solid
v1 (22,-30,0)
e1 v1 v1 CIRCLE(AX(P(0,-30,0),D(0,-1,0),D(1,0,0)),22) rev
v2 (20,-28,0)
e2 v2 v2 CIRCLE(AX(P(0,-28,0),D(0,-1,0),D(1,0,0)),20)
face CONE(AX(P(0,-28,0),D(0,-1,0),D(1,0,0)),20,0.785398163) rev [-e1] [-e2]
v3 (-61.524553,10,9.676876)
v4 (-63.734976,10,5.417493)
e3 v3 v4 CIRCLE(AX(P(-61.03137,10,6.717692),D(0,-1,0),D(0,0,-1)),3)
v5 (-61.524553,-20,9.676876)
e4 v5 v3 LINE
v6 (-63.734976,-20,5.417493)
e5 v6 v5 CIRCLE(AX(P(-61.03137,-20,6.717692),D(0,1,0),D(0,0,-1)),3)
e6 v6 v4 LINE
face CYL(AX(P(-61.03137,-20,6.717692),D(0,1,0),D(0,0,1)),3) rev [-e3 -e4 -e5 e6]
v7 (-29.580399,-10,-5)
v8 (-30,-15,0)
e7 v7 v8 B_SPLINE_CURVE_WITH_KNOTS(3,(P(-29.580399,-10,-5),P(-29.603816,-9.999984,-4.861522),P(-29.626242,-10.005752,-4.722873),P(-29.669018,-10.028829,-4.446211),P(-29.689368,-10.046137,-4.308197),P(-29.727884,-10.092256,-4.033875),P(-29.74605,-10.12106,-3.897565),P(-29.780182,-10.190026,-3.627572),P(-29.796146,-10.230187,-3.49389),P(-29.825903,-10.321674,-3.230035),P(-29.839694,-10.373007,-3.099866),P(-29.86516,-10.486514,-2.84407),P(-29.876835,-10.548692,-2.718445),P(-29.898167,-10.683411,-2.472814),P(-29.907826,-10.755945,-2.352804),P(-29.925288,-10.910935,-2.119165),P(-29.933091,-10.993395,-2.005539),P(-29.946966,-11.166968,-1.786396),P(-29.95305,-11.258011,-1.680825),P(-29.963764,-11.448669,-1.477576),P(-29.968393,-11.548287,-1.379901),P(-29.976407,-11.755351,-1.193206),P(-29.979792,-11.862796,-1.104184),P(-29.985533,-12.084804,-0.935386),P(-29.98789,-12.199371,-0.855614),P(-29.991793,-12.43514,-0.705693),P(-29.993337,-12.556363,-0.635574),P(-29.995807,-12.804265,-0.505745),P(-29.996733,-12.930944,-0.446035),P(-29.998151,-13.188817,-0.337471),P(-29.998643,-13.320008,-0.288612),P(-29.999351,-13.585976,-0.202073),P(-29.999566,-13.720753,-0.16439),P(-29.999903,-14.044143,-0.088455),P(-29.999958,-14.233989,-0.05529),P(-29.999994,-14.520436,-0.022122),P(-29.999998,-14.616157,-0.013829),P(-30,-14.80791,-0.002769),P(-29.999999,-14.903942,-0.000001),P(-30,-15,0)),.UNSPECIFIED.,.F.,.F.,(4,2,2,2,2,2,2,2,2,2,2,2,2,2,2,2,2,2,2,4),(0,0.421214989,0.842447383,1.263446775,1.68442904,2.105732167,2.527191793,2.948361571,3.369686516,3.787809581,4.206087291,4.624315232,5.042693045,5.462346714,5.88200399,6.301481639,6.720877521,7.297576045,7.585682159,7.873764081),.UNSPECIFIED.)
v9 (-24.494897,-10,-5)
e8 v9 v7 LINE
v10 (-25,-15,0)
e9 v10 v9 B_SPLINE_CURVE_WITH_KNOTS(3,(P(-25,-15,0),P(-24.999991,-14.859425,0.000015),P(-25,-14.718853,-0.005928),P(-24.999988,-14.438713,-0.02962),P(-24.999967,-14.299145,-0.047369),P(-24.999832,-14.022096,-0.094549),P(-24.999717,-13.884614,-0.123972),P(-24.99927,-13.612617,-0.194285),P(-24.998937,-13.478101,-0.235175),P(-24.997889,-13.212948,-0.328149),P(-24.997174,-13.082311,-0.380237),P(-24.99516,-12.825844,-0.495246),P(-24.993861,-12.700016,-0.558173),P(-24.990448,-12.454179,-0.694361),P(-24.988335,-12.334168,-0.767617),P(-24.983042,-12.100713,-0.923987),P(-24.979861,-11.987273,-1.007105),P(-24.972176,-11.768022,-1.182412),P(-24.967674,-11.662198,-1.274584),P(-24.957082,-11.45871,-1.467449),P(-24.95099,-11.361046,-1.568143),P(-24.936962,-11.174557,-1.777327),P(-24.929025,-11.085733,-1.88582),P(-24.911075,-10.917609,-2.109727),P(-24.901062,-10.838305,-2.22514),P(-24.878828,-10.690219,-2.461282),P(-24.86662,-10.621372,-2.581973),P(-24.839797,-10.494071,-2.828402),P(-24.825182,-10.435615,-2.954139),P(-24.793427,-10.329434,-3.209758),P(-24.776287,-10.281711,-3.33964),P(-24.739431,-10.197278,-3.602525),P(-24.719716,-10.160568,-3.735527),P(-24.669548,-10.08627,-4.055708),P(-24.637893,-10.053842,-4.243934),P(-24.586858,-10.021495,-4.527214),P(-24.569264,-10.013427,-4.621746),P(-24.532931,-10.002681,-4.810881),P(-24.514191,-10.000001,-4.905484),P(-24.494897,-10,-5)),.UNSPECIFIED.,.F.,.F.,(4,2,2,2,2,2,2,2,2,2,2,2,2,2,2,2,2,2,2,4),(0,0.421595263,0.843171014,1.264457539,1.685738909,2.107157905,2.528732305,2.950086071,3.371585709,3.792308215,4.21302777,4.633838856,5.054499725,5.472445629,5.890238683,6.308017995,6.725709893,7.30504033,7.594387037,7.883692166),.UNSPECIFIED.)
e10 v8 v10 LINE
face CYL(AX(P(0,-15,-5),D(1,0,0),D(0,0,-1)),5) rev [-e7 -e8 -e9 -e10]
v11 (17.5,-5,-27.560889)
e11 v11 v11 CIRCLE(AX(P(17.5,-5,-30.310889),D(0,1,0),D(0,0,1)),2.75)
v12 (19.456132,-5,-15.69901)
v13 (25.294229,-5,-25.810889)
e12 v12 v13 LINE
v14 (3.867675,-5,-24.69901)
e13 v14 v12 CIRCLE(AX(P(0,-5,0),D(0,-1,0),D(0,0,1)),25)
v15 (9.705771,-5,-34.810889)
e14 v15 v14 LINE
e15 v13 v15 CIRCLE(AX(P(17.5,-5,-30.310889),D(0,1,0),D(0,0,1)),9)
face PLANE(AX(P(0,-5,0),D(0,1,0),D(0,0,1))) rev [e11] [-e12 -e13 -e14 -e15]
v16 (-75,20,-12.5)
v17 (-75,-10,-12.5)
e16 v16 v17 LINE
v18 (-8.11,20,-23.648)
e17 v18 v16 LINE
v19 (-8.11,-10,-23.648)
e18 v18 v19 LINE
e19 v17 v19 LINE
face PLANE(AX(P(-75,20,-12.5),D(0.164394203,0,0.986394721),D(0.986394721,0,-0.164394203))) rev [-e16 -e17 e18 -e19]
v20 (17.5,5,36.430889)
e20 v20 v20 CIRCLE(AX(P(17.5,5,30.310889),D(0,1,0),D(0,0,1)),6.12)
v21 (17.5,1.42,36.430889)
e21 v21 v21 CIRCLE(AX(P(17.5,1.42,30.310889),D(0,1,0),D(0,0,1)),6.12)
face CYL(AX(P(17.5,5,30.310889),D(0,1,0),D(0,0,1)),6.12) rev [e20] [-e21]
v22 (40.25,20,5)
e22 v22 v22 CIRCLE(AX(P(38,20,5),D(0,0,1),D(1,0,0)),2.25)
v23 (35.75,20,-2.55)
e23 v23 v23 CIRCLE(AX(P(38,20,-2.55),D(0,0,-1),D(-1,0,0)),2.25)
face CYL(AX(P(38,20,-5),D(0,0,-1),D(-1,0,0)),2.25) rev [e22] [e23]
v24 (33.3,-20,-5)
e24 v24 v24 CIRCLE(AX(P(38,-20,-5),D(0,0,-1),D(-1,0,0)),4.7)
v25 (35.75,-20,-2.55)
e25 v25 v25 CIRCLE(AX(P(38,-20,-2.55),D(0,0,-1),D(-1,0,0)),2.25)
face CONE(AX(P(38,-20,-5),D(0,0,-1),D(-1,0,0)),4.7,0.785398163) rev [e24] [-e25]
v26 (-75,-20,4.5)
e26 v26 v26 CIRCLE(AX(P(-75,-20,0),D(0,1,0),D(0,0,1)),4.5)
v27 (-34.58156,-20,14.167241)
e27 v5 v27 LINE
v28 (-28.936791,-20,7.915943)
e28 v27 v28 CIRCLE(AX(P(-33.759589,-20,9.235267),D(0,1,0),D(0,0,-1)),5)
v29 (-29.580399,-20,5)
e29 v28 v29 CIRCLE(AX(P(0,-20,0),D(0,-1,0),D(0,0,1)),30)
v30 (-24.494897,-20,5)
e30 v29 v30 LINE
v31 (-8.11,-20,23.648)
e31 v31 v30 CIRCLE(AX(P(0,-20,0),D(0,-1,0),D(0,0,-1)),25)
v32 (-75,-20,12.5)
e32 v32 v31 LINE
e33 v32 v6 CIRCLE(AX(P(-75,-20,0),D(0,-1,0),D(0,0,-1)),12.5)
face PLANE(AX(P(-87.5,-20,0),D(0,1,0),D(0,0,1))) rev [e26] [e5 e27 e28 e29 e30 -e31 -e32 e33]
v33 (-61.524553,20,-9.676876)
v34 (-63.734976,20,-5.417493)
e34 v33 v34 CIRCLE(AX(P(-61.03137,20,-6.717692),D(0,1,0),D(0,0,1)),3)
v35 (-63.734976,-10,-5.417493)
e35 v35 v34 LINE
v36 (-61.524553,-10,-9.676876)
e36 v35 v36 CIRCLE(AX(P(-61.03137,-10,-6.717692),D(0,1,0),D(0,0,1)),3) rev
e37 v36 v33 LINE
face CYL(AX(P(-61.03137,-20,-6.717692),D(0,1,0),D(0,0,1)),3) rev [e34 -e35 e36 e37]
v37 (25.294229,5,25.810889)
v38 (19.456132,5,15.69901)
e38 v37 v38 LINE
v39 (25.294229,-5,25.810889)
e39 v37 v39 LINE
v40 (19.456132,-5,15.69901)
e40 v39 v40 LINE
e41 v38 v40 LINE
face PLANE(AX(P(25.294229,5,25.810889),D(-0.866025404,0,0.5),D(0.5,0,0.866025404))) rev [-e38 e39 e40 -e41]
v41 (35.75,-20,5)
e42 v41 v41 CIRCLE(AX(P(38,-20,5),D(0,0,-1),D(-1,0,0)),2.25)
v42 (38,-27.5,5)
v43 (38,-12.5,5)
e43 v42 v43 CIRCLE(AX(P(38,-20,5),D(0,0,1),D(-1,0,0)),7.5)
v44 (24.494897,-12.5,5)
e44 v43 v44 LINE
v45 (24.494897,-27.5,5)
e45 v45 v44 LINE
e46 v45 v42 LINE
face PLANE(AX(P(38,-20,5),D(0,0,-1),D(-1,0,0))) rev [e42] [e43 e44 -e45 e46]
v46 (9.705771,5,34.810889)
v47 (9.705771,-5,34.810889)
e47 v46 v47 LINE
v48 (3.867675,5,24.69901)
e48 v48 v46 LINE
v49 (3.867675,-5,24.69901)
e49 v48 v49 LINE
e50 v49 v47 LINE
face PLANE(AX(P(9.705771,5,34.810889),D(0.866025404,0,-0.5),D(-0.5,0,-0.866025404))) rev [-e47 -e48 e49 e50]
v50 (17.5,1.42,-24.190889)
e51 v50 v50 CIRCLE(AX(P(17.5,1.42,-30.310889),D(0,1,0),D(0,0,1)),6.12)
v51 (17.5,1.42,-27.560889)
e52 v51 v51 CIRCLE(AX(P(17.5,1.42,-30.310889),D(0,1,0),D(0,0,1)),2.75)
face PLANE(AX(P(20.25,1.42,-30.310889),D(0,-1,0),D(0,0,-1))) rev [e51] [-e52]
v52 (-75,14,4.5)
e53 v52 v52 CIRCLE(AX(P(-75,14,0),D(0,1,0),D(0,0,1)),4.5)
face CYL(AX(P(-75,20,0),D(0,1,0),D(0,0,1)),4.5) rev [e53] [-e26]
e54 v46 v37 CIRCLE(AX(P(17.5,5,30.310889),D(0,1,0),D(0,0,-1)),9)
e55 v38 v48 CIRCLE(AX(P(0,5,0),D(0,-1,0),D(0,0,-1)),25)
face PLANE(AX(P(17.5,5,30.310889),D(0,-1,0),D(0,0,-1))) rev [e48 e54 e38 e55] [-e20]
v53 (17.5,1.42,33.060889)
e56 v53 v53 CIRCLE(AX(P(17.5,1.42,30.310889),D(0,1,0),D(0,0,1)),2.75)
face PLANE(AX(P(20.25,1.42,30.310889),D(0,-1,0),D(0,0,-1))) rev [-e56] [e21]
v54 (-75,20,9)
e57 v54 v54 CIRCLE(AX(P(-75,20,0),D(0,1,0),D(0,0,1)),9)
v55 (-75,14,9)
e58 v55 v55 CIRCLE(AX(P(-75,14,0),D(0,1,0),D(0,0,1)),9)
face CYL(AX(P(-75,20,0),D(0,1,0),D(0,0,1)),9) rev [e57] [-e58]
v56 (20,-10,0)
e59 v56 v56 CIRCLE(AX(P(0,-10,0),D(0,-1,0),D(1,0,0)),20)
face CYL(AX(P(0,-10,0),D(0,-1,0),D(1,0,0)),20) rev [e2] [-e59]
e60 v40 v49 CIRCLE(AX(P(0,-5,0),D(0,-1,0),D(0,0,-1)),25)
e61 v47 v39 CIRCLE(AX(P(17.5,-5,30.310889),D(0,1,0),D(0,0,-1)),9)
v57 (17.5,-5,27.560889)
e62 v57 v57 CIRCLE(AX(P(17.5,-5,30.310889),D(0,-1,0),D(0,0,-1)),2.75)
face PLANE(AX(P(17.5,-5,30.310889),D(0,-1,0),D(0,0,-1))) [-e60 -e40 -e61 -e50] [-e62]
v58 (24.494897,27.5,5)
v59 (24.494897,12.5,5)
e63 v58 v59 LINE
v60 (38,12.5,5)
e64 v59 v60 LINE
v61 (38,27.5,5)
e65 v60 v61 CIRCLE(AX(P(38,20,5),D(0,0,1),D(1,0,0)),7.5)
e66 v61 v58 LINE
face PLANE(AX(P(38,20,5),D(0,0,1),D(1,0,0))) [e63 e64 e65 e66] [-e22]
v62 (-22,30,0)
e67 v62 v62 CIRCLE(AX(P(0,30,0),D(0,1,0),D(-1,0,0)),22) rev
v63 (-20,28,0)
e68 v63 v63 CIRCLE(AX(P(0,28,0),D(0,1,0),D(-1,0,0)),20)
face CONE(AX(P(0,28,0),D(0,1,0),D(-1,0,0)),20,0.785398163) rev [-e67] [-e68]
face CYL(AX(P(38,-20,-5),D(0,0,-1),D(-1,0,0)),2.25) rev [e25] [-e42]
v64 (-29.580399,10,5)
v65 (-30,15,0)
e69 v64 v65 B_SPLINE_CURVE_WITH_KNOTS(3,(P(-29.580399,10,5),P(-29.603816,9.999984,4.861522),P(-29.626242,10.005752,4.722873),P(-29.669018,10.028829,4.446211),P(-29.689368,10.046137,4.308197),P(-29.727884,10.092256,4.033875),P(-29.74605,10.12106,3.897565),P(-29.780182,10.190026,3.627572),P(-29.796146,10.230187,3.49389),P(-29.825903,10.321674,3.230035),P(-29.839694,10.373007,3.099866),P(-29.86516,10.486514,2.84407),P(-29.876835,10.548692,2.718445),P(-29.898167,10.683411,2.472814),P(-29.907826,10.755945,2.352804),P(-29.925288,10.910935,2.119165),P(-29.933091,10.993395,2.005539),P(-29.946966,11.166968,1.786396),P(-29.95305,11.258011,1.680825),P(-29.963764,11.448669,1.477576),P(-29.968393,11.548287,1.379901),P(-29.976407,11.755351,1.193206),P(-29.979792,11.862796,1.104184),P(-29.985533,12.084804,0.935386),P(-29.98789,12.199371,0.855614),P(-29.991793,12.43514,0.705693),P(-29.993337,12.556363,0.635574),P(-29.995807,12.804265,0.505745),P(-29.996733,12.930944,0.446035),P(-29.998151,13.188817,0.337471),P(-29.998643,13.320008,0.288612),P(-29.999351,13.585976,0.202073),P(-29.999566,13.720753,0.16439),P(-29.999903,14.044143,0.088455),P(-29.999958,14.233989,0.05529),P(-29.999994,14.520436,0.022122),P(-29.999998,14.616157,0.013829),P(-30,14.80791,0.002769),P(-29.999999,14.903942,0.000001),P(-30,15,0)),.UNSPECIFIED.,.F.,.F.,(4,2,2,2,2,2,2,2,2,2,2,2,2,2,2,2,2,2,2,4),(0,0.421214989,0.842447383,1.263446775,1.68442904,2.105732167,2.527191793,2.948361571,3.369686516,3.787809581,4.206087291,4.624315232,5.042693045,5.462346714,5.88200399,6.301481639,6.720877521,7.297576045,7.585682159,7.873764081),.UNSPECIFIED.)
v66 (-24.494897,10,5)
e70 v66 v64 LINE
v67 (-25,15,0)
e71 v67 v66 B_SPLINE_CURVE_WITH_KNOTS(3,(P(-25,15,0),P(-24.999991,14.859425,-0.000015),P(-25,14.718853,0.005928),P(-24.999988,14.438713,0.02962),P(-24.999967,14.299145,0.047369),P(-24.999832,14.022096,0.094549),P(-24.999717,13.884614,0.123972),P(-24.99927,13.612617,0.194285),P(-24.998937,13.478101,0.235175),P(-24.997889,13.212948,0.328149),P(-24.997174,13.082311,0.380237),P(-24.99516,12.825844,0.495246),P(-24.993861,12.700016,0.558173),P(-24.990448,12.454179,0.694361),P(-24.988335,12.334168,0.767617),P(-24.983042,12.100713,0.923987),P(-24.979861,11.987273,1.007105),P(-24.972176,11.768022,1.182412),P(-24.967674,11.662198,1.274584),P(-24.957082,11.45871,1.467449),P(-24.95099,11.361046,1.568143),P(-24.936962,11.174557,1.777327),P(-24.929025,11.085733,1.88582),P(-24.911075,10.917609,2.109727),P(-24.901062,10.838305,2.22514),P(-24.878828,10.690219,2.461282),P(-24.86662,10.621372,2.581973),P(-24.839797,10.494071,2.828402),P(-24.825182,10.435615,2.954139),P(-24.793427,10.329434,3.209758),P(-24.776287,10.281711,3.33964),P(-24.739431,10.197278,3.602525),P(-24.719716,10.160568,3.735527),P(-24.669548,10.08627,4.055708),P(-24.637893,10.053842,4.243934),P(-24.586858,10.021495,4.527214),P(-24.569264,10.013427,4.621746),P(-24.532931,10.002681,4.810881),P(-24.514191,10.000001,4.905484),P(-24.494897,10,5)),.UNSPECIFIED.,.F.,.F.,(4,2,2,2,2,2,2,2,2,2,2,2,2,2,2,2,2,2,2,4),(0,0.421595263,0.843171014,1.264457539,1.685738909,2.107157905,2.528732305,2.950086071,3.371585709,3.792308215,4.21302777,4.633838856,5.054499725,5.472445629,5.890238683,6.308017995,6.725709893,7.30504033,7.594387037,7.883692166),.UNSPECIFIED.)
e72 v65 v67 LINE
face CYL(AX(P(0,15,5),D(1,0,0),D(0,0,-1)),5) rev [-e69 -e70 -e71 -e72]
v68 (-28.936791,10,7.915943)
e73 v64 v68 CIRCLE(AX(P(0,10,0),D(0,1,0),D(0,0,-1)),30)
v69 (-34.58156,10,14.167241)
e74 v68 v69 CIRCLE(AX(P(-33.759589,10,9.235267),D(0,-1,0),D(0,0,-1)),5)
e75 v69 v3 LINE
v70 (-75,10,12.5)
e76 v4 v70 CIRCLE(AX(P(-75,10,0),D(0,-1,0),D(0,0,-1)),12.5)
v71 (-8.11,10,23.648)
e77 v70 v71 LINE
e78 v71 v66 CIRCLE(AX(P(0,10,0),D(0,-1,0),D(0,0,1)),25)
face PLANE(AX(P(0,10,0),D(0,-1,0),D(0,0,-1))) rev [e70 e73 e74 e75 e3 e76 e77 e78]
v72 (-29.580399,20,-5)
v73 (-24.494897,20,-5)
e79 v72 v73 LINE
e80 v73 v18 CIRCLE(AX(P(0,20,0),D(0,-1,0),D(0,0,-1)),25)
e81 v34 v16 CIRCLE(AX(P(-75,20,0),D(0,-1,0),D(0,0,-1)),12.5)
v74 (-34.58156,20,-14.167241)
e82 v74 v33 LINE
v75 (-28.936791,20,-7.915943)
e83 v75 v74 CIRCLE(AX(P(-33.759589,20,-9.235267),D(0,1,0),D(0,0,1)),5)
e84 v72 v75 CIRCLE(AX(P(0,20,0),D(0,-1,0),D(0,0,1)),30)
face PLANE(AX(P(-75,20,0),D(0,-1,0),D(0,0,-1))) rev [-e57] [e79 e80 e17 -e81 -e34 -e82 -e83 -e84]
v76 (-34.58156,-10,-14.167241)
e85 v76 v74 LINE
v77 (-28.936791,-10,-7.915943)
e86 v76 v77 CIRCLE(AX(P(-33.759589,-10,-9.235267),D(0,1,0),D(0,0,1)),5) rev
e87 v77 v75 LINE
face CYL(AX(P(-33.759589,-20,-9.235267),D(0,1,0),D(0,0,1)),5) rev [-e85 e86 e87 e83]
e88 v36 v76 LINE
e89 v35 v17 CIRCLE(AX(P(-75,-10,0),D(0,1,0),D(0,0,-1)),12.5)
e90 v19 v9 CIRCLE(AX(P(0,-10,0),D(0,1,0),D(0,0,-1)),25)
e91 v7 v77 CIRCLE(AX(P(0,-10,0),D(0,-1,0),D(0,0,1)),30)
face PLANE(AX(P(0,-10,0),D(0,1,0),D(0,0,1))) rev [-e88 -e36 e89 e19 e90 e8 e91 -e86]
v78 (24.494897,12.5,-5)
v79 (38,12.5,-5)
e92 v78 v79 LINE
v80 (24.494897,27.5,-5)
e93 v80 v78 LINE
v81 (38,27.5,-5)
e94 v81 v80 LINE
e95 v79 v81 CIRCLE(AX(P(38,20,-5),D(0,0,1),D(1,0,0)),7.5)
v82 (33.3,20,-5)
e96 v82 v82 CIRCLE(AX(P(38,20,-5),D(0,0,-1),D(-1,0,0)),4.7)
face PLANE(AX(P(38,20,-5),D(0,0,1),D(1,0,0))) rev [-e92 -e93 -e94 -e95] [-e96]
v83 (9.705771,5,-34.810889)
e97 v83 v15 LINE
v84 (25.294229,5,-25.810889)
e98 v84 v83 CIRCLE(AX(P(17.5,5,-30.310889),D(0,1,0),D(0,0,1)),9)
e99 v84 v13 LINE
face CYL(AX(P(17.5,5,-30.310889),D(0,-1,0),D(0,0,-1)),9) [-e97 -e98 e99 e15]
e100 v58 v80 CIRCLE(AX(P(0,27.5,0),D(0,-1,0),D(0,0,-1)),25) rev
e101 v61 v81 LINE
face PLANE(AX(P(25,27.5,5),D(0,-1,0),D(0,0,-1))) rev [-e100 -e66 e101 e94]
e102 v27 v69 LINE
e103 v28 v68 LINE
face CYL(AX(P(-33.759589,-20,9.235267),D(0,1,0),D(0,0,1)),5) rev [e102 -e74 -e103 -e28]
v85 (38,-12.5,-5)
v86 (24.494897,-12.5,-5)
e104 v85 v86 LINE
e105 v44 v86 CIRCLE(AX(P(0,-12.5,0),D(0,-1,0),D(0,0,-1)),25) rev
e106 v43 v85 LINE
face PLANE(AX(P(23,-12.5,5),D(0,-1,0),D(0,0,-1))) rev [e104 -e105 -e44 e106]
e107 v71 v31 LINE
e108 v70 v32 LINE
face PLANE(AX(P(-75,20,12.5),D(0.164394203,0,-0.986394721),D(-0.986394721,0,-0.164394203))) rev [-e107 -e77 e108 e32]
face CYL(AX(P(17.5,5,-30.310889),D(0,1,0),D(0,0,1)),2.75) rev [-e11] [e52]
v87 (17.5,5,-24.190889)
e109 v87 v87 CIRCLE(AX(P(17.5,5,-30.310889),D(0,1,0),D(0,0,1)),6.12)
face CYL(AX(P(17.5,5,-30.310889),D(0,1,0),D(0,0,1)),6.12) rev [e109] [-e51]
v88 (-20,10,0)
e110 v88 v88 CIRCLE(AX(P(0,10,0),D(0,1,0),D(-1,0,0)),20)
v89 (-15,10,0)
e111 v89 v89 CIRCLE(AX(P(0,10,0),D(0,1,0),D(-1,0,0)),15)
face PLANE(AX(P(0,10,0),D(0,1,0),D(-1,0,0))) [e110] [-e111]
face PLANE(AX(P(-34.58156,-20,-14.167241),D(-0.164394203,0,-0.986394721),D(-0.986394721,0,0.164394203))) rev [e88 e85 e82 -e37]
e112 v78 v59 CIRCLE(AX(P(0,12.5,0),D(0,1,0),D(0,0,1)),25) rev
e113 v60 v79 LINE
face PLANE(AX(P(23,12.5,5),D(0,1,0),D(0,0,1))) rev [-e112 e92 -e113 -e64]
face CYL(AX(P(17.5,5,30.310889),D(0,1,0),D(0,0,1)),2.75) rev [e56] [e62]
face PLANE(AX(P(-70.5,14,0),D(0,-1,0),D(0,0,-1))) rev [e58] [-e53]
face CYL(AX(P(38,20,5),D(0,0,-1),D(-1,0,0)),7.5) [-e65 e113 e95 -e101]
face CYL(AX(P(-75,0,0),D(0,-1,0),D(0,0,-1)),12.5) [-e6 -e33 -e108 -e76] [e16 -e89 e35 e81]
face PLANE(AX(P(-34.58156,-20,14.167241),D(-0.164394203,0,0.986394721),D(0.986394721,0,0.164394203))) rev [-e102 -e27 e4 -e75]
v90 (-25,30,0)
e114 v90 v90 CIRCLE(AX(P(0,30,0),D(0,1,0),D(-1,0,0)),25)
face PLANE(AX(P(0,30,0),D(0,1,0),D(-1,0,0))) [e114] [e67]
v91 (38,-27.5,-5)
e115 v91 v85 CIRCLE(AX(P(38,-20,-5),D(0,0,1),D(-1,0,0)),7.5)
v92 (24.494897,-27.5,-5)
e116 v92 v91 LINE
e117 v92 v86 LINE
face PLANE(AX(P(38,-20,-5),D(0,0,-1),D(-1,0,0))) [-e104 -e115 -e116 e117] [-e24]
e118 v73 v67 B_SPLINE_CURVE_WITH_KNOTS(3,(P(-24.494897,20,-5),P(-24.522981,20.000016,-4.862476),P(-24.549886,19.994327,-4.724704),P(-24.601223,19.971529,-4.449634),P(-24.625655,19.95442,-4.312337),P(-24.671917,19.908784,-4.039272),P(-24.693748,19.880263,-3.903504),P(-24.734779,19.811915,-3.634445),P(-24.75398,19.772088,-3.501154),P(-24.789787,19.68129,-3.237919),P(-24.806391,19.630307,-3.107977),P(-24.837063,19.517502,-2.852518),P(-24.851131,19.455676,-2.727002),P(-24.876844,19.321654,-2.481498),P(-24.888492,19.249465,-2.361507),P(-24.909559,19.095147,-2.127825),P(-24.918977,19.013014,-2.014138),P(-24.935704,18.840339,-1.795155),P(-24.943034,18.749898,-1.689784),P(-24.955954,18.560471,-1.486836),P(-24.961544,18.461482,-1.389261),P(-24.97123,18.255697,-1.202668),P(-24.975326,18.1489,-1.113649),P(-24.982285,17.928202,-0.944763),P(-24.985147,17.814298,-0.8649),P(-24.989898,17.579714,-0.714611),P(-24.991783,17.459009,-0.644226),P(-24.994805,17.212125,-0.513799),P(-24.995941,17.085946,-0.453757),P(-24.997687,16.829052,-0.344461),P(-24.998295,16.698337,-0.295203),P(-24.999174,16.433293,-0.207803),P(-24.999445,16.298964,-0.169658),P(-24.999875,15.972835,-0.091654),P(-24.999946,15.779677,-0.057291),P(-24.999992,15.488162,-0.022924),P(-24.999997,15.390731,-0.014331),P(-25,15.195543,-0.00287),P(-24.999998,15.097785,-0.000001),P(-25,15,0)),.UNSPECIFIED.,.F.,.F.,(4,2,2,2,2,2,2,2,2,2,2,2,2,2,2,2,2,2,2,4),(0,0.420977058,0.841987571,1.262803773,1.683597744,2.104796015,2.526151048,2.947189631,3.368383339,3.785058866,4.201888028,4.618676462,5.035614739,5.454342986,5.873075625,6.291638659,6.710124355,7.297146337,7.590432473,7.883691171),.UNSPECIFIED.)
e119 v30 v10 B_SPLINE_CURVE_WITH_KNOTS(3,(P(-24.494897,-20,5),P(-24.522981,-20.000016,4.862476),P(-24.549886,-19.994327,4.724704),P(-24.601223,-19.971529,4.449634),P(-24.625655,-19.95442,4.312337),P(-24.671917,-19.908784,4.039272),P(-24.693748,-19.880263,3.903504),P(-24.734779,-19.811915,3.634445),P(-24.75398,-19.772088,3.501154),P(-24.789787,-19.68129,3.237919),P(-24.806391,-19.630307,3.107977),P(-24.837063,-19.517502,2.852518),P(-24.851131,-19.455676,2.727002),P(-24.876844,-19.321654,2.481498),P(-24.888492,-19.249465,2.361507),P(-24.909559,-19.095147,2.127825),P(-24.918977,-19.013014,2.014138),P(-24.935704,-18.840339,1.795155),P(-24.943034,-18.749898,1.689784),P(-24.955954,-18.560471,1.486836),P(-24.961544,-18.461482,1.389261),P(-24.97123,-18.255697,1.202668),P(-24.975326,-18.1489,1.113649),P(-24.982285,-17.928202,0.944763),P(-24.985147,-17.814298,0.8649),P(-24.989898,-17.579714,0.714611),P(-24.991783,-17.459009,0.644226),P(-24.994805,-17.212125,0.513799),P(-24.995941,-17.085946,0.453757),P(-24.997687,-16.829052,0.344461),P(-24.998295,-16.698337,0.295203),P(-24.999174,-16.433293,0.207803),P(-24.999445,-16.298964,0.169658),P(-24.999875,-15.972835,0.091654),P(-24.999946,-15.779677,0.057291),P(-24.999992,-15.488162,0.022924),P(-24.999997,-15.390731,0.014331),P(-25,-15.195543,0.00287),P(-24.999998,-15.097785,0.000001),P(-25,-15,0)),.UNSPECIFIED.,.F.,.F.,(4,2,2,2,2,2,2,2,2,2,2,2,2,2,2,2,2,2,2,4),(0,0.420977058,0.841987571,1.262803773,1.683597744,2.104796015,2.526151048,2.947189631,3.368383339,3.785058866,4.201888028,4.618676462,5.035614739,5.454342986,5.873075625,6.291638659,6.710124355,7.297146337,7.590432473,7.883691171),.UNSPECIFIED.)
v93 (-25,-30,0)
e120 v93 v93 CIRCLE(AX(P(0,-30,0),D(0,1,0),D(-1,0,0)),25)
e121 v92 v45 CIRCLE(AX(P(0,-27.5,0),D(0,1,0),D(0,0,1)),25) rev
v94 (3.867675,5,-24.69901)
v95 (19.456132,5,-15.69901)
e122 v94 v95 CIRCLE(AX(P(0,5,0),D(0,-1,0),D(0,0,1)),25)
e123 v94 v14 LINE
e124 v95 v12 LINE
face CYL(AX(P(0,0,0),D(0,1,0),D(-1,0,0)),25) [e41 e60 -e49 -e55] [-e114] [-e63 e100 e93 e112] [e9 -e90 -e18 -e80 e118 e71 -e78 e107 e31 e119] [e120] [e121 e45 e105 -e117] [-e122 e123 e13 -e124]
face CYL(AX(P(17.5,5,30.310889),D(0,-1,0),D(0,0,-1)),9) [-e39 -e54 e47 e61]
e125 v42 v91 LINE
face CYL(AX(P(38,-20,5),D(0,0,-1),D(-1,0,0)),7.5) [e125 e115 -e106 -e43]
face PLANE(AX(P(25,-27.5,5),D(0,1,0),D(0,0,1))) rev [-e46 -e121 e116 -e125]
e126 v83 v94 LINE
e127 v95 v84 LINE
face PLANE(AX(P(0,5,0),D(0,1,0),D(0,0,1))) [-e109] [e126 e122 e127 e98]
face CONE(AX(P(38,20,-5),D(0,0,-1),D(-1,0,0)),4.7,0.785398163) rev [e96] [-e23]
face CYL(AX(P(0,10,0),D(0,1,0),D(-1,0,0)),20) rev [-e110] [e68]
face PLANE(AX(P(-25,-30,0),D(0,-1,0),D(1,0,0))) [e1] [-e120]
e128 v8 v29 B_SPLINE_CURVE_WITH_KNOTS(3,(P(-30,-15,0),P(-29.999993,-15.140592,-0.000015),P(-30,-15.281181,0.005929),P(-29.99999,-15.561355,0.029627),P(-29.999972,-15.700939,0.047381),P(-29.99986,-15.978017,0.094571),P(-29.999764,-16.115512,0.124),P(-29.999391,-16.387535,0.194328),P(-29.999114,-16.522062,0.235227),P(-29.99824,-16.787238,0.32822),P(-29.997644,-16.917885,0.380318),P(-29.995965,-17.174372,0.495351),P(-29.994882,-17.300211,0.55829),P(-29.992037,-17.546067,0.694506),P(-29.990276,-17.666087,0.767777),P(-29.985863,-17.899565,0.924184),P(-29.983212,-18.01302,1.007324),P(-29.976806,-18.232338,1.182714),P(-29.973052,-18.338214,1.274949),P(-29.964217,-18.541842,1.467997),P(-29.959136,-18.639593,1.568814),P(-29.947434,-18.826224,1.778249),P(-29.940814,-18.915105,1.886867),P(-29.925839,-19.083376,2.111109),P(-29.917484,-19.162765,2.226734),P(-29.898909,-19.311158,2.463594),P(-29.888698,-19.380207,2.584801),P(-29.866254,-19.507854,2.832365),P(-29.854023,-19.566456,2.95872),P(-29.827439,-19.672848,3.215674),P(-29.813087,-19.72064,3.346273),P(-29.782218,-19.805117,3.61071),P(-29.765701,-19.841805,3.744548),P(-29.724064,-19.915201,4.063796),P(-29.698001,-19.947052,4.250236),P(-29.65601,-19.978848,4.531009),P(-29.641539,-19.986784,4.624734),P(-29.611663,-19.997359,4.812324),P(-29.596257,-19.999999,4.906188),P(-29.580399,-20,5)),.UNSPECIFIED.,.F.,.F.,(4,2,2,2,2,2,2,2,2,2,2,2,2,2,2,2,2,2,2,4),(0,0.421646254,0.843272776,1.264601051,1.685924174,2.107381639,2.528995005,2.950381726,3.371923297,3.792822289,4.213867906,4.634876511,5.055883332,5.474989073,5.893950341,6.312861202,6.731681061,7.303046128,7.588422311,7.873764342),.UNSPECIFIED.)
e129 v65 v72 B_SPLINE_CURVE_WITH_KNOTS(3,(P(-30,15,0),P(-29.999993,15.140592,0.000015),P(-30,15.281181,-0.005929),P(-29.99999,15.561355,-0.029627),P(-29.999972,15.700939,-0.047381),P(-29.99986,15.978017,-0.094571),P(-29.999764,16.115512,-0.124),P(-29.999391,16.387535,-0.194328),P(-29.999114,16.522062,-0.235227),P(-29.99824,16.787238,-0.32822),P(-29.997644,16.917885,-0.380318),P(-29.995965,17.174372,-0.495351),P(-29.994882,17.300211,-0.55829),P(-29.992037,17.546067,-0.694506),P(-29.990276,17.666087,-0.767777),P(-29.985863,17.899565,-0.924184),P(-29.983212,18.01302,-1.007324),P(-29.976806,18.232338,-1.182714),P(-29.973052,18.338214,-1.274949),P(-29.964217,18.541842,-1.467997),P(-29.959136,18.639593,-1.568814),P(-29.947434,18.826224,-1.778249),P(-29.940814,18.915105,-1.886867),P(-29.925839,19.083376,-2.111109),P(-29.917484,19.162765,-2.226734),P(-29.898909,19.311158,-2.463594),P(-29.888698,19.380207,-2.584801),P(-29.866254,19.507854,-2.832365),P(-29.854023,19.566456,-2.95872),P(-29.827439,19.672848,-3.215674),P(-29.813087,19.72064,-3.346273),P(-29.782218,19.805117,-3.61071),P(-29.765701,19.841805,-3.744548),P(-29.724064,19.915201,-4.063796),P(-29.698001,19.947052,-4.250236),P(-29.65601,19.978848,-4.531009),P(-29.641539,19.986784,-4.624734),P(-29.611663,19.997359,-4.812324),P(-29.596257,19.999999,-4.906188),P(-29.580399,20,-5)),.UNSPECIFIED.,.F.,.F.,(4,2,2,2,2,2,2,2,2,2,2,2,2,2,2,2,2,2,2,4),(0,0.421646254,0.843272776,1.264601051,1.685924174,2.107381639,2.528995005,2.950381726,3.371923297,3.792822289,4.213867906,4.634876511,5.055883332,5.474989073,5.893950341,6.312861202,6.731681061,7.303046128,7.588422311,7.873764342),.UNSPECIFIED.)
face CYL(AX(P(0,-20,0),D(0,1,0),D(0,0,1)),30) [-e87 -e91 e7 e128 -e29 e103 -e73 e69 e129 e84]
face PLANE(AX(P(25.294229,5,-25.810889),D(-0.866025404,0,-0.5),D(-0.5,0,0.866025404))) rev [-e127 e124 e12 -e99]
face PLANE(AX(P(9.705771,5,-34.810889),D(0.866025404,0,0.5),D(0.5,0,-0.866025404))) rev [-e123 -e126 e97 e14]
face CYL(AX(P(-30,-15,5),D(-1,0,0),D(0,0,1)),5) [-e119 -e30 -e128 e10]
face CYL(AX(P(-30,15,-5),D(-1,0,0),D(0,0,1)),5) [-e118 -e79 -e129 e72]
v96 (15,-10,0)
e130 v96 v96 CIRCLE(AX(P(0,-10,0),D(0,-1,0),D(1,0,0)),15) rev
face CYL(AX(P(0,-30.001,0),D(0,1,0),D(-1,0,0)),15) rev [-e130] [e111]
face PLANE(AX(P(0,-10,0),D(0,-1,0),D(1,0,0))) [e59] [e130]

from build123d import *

# Parameters (mm, degrees)
SKETCH3_R                                      = 20
CUT_EXTRUDE1_DEPTH                             = 20
CUT_EXTRUDE2_START                             = -20
SKETCH4_R                                      = 20
CUT_EXTRUDE2_DEPTH                             = 20
SKETCH5_R                                      = 15
CUT_EXTRUDE3_DEPTH                             = 20
CHAMFER1_SIZE                                  = 2
CHAMFER2_SIZE                                  = 2
BOSS_EXTRUDE1_DEPTH                            = 5
CSK_FOR_M4_FLAT_HEAD_MACHINE_SCREW1_AT_2_COUNT = 2
CSK_FOR_M4_FLAT_HEAD_MACHINE_SCREW1_AT_2_PITCH = 40
BOSS_EXTRUDE2_DEPTH                            = 5
CBORE_FOR_M5_HEX_HEAD_BOLT1_AT_2_COUNT         = 2
CBORE_FOR_M5_HEX_HEAD_BOLT1_AT_2_PITCH         = 60.621778265
BOSS_EXTRUDE3_DEPTH                            = 20
CUT_EXTRUDE4_DEPTH                             = 20
CUT_EXTRUDE5_DEPTH                             = 10
CUT_EXTRUDE6_START                             = -10
CUT_EXTRUDE6_DEPTH                             = 10
FILLET1_R                                      = 5


with BuildPart() as part:
    # Sketch1 → Revolve1 (revolve)
    with BuildSketch(Plane.XY):
        Polygon((0, 0), (0, 30), (-25, 30), (-25, -30), (0, -30), align=None)
    revolve(axis=Axis((0, 0, 0), (0, -1, 0)))

    # Sketch3 → Cut-Extrude1 (cut)
    with BuildSketch(Plane(origin=(0, 30, 0), x_dir=(1, 0, 0), z_dir=(0, 1, 0))):
        with Locations(Location((0, 0, 0), (0, 0, 180))):
            Circle(SKETCH3_R)
    extrude(amount=-CUT_EXTRUDE1_DEPTH, mode=Mode.SUBTRACT)

    # Sketch4 → Cut-Extrude2 (cut)
    with BuildSketch(Plane.XZ.offset(30).offset(CUT_EXTRUDE2_START)):
        with Locations(Location((0, 0, 0), (0, 0, 180))):
            Circle(SKETCH4_R)
    extrude(amount=CUT_EXTRUDE2_DEPTH, mode=Mode.SUBTRACT)

    # Sketch5 → Cut-Extrude3 (cut)
    with BuildSketch(Plane(origin=(0, 10, 0), x_dir=(1, 0, 0), z_dir=(0, 1, 0))):
        with Locations(Location((0, 0, 0), (0, 0, 180))):
            Circle(SKETCH5_R)
    extrude(amount=-CUT_EXTRUDE3_DEPTH, mode=Mode.SUBTRACT)

    # Chamfer1
    chamfer1_edges = [part.edges().sort_by_distance(p)[0] for p in [
        (20, -30, 0),
    ]]
    chamfer(chamfer1_edges, length=CHAMFER1_SIZE)

    # Chamfer2
    chamfer2_edges = [part.edges().sort_by_distance(p)[0] for p in [
        (20, 30, 0),
    ]]
    chamfer(chamfer2_edges, length=CHAMFER2_SIZE)

    # Sketch10 → Boss-Extrude1 (add, symmetric)
    with BuildSketch(Plane.XY):
        with BuildLine():
            Line((25, 27.5), (23, 27.5))
            Line((23, 27.5), (23, 12.5))
            Line((23, 12.5), (38, 12.5))
            ThreePointArc((38, 12.5), (45.5, 20), (38, 27.5))
            Line((38, 27.5), (25, 27.5))
        make_face()
        with BuildLine():
            Line((23, -12.5), (38, -12.5))
            ThreePointArc((38, -12.5), (45.5, -20), (38, -27.5))
            Line((38, -27.5), (25, -27.5))
            Line((25, -27.5), (23, -27.5))
            Line((23, -27.5), (23, -12.5))
        make_face()
    extrude(amount=BOSS_EXTRUDE1_DEPTH, both=True)

    # Sketch12 → CSK for M4 Flat Head Machine Screw1 (revolve, cut)
    with BuildSketch(Plane(origin=(38, 20, -5), x_dir=(0, 1, 0), z_dir=(1, 0, 0))):
        Polygon((0, 0), (0, 30), (2.25, 30), (2.25, 2.45), (4.7, 0), align=None)
    csk_for_m4_flat_head_machine_screw1 = revolve(axis=Axis((38, 20, -11.35), (0, 0, 1)), mode=Mode.SUBTRACT)

    # CSK for M4 Flat Head Machine Screw1 at 2: CSK for M4 Flat Head Machine Screw1 ×2
    with Locations(*[(0, -i * CSK_FOR_M4_FLAT_HEAD_MACHINE_SCREW1_AT_2_PITCH, 0) for i in range(1, CSK_FOR_M4_FLAT_HEAD_MACHINE_SCREW1_AT_2_COUNT)]):
        add(csk_for_m4_flat_head_machine_screw1, mode=Mode.SUBTRACT)

    # Sketch13 → Boss-Extrude2 (add, symmetric)
    with BuildSketch(Plane(origin=(0, 0, 0), x_dir=(1, 0, 0), z_dir=(0, 1, 0))):
        with BuildLine():
            Line((9.705771366, 34.810889132), (3.867675156, 24.699009877))
            ThreePointArc((3.867675156, 24.699009877), (12.5, 21.650635095), (19.456132424, 15.699009877))
            Line((19.456132424, 15.699009877), (25.294228634, 25.810889132))
            ThreePointArc((25.294228634, 25.810889132), (22, 38.105117767), (9.705771366, 34.810889132))
        make_face()
        with BuildLine():
            Line((9.705771366, -34.810889132), (3.867675156, -24.699009877))
            ThreePointArc((3.867675156, -24.699009877), (12.5, -21.650635095), (19.456132424, -15.699009877))
            Line((19.456132424, -15.699009877), (25.294228634, -25.810889132))
            ThreePointArc((25.294228634, -25.810889132), (22, -38.105117767), (9.705771366, -34.810889132))
        make_face()
    extrude(amount=BOSS_EXTRUDE2_DEPTH, both=True)

    # Sketch15 → CBORE for M5 Hex Head Bolt1 (revolve, cut)
    with BuildSketch(Plane(origin=(17.5, 5, -30.310889132), x_dir=(0, 0, 1), z_dir=(1, 0, 0))):
        Polygon((0, 0), (0, 35), (2.75, 35), (2.75, 3.58), (6.12, 3.58), (6.12, 0), align=None)
    cbore_for_m5_hex_head_bolt1 = revolve(axis=Axis((17.5, 11.35, -30.310889132), (0, -1, 0)), mode=Mode.SUBTRACT)

    # CBORE for M5 Hex Head Bolt1 at 2: CBORE for M5 Hex Head Bolt1 ×2
    with Locations(*[(0, 0, i * CBORE_FOR_M5_HEX_HEAD_BOLT1_AT_2_PITCH) for i in range(1, CBORE_FOR_M5_HEX_HEAD_BOLT1_AT_2_COUNT)]):
        add(cbore_for_m5_hex_head_bolt1, mode=Mode.SUBTRACT)



with BuildPart() as body_2:
    # Sketch2 → Revolve2 (revolve)
    with BuildSketch(Plane.XY, mode=Mode.PRIVATE) as revolve2_sk:
        Polygon((-75, 0), (-75, 20), (-87.5, 20), (-87.5, -20), (-75, -20), align=None)
    revolve(revolve2_sk.sketch.rotate(Axis((-75, 0, 0), (0, 1, 0)), 270), axis=Axis((-75, 0, 0), (0, 1, 0)))

    # Sketch9 → CBORE for M8 Pan Head Machine Screw2 (revolve, cut)
    with BuildSketch(Plane(origin=(-75, 20, 0), x_dir=(0, 0, 1), z_dir=(1, 0, 0))):
        Polygon((0, 0), (0, 50), (4.5, 50), (4.5, 6), (9, 6), (9, 0), align=None)
    revolve(axis=Axis((-75, 26.35, 0), (0, -1, 0)), mode=Mode.SUBTRACT)


with BuildPart() as part_1:
    add(part.part)

    add(body_2.part)  # Boss-Extrude3 merges body 2
    # Sketch16 → Boss-Extrude3 (add, symmetric)
    with BuildSketch(Plane(origin=(0, 0, 0), x_dir=(1, 0, 0), z_dir=(0, 1, 0))):
        with BuildLine():
            Line((-75, 12.5), (-8.11, 23.647999915))
            ThreePointArc((-8.11, 23.647999915), (-25, 0), (-8.11, -23.647999915))
            Line((-8.11, -23.647999915), (-75, -12.5))
            ThreePointArc((-75, -12.5), (-62.5, 0), (-75, 12.5))
        make_face()
    extrude(amount=BOSS_EXTRUDE3_DEPTH, both=True)

    # Sketch17 → Cut-Extrude4 (cut, symmetric)
    with BuildSketch(Plane(origin=(0, 0, 0), x_dir=(1, 0, 0), z_dir=(0, 1, 0))):
        with BuildLine():
            Line((-34.581559949, -14.167240529), (-61.524552888, -9.676876005))
            ThreePointArc((-61.524552888, -9.676876005), (-63.694159972, -8.0995569), (-63.73497603, -5.41749342))
            ThreePointArc((-63.73497603, -5.41749342), (-62.5, 0), (-63.73497603, 5.41749342))
            ThreePointArc((-63.73497603, 5.41749342), (-63.694159972, 8.0995569), (-61.524552888, 9.676876005))
            Line((-61.524552888, 9.676876005), (-34.581559949, 14.167240529))
            ThreePointArc((-34.581559949, 14.167240529), (-30.048614002, 12.586186956), (-28.936790513, 7.915943077))
            ThreePointArc((-28.936790513, 7.915943077), (-30, 0), (-28.936790513, -7.915943077))
            ThreePointArc((-28.936790513, -7.915943077), (-30.048614002, -12.586186956), (-34.581559949, -14.167240529))
        make_face()
    extrude(amount=CUT_EXTRUDE4_DEPTH, both=True, mode=Mode.SUBTRACT)

    # Sketch18 → Cut-Extrude5 (cut)
    with BuildSketch(Plane(origin=(0, 20, 0), x_dir=(1, 0, 0), z_dir=(0, 1, 0))):
        with BuildLine():
            Line((-30, 0), (-25, 0))
            ThreePointArc((-25, 0), (-20.34391801, -14.530141087), (-8.11, -23.647999915))
            Line((-8.11, -23.647999915), (-75, -12.5))
            ThreePointArc((-75, -12.5), (-68.346755219, -10.582265064), (-63.73497603, -5.41749342))
            ThreePointArc((-63.73497603, -5.41749342), (-63.694159972, -8.0995569), (-61.524552888, -9.676876005))
            Line((-61.524552888, -9.676876005), (-34.581559949, -14.167240529))
            ThreePointArc((-34.581559949, -14.167240529), (-30.048614002, -12.586186956), (-28.936790513, -7.915943077))
            ThreePointArc((-28.936790513, -7.915943077), (-29.733009563, -3.993512527), (-30, 0))
        make_face()
    extrude(amount=-CUT_EXTRUDE5_DEPTH, mode=Mode.SUBTRACT)

    # Sketch19 → Cut-Extrude6 (cut)
    with BuildSketch(Plane.XZ.offset(20).offset(CUT_EXTRUDE6_START)):
        with BuildLine():
            Line((-30, 0), (-25, 0))
            ThreePointArc((-25, 0), (-20.34391801, -14.530141087), (-8.11, -23.647999915))
            Line((-8.11, -23.647999915), (-75, -12.5))
            ThreePointArc((-75, -12.5), (-68.346755219, -10.582265064), (-63.73497603, -5.41749342))
            ThreePointArc((-63.73497603, -5.41749342), (-63.611614037, -8.056719366), (-61.524552888, -9.676876005))
            Line((-61.524552888, -9.676876005), (-33.759588932, -14.235266923))
            ThreePointArc((-33.759588932, -14.235266923), (-29.784880186, -12.268695739), (-28.936790513, -7.915943077))
            ThreePointArc((-28.936790513, -7.915943077), (-29.733009563, -3.993512527), (-30, 0))
        make_face()
    extrude(amount=CUT_EXTRUDE6_DEPTH, mode=Mode.SUBTRACT)

    # Fillet1
    # the kernel refuses this fillet: 5 mm, written as the material it adds along each edge
    with BuildSketch(Plane(origin=(-42.5, 10, 0), x_dir=(0, 0, 1), z_dir=(1, 0, 0))) as fillet1_piece_1_section:
        with BuildLine():
            CenterArc((FILLET1_R, -FILLET1_R), FILLET1_R, 90, 90)
            Line((0, -FILLET1_R), (0, 0))
            Line((0, 0), (FILLET1_R, 0))
        make_face()
    fillet1_piece_1 = extrude(amount=30, mode=Mode.PRIVATE)
    fillet1_piece_1 = fillet1_piece_1 & Plane(origin=(0, 11.115866263, 0), x_dir=(-0.9645596837736771, 0, -0.26386476922549573), z_dir=(0, 1, 0)) * Cylinder(30, 80, mode=Mode.PRIVATE)
    fillet1_piece_1 = fillet1_piece_1 - Plane(origin=(0, 11.115866263, 0), x_dir=(-1, 0, 0), z_dir=(0, 1, 0)) * Cylinder(20, 80, mode=Mode.PRIVATE)
    add(fillet1_piece_1)
    with BuildSketch(Plane(origin=(-42.5, -10, 0), x_dir=(0, 0, -1), z_dir=(1, 0, 0))) as fillet1_piece_2_section:
        with BuildLine():
            CenterArc((FILLET1_R, -FILLET1_R), FILLET1_R, 90, 90)
            Line((0, -FILLET1_R), (0, 0))
            Line((0, 0), (FILLET1_R, 0))
        make_face()
    fillet1_piece_2 = extrude(amount=30, mode=Mode.PRIVATE)
    fillet1_piece_2 = fillet1_piece_2 & Plane(origin=(0, -11.11586543, 0), x_dir=(-0.9645596837736771, 0, -0.26386476922549573), z_dir=(0, 1, 0)) * Cylinder(30, 80, mode=Mode.PRIVATE)
    fillet1_piece_2 = fillet1_piece_2 - Plane(origin=(0, -11.11586543, 0), x_dir=(-1, 0, 0), z_dir=(0, 1, 0)) * Cylinder(20, 80, mode=Mode.PRIVATE)
    add(fillet1_piece_2)
    # the kernel refuses this fillet: 5 mm, written as the material it takes off along each edge
    with BuildSketch(Plane(origin=(-42.5, 20, 0), x_dir=(0, -1, 0), z_dir=(1, 0, 0))) as fillet1_2_piece_1_section:
        with BuildLine():
            CenterArc((FILLET1_R, FILLET1_R), FILLET1_R, 180, 90)
            Line((0, FILLET1_R), (0, 0))
            Line((0, 0), (FILLET1_R, 0))
        make_face()
    fillet1_2_piece_1 = extrude(amount=30, mode=Mode.PRIVATE)
    fillet1_2_piece_1 = fillet1_2_piece_1 - Plane(origin=(0, 18.884144213, 0), x_dir=(-1, 0, 0), z_dir=(0, -1, 0)) * Cylinder(25, 80, mode=Mode.PRIVATE)
    add(fillet1_2_piece_1, mode=Mode.SUBTRACT)
    with BuildSketch(Plane(origin=(-42.5, -20, 0), x_dir=(0, 0, 1), z_dir=(1, 0, 0))) as fillet1_2_piece_2_section:
        with BuildLine():
            CenterArc((FILLET1_R, -FILLET1_R), FILLET1_R, 90, 90)
            Line((0, -FILLET1_R), (0, 0))
            Line((0, 0), (FILLET1_R, 0))
        make_face()
    fillet1_2_piece_2 = extrude(amount=30, mode=Mode.PRIVATE)
    fillet1_2_piece_2 = fillet1_2_piece_2 - Plane(origin=(0, -18.884130023, 0), x_dir=(-1, 0, 0), z_dir=(0, -1, 0)) * Cylinder(25, 80, mode=Mode.PRIVATE)
    add(fillet1_2_piece_2, mode=Mode.SUBTRACT)


solid = part_1.part
